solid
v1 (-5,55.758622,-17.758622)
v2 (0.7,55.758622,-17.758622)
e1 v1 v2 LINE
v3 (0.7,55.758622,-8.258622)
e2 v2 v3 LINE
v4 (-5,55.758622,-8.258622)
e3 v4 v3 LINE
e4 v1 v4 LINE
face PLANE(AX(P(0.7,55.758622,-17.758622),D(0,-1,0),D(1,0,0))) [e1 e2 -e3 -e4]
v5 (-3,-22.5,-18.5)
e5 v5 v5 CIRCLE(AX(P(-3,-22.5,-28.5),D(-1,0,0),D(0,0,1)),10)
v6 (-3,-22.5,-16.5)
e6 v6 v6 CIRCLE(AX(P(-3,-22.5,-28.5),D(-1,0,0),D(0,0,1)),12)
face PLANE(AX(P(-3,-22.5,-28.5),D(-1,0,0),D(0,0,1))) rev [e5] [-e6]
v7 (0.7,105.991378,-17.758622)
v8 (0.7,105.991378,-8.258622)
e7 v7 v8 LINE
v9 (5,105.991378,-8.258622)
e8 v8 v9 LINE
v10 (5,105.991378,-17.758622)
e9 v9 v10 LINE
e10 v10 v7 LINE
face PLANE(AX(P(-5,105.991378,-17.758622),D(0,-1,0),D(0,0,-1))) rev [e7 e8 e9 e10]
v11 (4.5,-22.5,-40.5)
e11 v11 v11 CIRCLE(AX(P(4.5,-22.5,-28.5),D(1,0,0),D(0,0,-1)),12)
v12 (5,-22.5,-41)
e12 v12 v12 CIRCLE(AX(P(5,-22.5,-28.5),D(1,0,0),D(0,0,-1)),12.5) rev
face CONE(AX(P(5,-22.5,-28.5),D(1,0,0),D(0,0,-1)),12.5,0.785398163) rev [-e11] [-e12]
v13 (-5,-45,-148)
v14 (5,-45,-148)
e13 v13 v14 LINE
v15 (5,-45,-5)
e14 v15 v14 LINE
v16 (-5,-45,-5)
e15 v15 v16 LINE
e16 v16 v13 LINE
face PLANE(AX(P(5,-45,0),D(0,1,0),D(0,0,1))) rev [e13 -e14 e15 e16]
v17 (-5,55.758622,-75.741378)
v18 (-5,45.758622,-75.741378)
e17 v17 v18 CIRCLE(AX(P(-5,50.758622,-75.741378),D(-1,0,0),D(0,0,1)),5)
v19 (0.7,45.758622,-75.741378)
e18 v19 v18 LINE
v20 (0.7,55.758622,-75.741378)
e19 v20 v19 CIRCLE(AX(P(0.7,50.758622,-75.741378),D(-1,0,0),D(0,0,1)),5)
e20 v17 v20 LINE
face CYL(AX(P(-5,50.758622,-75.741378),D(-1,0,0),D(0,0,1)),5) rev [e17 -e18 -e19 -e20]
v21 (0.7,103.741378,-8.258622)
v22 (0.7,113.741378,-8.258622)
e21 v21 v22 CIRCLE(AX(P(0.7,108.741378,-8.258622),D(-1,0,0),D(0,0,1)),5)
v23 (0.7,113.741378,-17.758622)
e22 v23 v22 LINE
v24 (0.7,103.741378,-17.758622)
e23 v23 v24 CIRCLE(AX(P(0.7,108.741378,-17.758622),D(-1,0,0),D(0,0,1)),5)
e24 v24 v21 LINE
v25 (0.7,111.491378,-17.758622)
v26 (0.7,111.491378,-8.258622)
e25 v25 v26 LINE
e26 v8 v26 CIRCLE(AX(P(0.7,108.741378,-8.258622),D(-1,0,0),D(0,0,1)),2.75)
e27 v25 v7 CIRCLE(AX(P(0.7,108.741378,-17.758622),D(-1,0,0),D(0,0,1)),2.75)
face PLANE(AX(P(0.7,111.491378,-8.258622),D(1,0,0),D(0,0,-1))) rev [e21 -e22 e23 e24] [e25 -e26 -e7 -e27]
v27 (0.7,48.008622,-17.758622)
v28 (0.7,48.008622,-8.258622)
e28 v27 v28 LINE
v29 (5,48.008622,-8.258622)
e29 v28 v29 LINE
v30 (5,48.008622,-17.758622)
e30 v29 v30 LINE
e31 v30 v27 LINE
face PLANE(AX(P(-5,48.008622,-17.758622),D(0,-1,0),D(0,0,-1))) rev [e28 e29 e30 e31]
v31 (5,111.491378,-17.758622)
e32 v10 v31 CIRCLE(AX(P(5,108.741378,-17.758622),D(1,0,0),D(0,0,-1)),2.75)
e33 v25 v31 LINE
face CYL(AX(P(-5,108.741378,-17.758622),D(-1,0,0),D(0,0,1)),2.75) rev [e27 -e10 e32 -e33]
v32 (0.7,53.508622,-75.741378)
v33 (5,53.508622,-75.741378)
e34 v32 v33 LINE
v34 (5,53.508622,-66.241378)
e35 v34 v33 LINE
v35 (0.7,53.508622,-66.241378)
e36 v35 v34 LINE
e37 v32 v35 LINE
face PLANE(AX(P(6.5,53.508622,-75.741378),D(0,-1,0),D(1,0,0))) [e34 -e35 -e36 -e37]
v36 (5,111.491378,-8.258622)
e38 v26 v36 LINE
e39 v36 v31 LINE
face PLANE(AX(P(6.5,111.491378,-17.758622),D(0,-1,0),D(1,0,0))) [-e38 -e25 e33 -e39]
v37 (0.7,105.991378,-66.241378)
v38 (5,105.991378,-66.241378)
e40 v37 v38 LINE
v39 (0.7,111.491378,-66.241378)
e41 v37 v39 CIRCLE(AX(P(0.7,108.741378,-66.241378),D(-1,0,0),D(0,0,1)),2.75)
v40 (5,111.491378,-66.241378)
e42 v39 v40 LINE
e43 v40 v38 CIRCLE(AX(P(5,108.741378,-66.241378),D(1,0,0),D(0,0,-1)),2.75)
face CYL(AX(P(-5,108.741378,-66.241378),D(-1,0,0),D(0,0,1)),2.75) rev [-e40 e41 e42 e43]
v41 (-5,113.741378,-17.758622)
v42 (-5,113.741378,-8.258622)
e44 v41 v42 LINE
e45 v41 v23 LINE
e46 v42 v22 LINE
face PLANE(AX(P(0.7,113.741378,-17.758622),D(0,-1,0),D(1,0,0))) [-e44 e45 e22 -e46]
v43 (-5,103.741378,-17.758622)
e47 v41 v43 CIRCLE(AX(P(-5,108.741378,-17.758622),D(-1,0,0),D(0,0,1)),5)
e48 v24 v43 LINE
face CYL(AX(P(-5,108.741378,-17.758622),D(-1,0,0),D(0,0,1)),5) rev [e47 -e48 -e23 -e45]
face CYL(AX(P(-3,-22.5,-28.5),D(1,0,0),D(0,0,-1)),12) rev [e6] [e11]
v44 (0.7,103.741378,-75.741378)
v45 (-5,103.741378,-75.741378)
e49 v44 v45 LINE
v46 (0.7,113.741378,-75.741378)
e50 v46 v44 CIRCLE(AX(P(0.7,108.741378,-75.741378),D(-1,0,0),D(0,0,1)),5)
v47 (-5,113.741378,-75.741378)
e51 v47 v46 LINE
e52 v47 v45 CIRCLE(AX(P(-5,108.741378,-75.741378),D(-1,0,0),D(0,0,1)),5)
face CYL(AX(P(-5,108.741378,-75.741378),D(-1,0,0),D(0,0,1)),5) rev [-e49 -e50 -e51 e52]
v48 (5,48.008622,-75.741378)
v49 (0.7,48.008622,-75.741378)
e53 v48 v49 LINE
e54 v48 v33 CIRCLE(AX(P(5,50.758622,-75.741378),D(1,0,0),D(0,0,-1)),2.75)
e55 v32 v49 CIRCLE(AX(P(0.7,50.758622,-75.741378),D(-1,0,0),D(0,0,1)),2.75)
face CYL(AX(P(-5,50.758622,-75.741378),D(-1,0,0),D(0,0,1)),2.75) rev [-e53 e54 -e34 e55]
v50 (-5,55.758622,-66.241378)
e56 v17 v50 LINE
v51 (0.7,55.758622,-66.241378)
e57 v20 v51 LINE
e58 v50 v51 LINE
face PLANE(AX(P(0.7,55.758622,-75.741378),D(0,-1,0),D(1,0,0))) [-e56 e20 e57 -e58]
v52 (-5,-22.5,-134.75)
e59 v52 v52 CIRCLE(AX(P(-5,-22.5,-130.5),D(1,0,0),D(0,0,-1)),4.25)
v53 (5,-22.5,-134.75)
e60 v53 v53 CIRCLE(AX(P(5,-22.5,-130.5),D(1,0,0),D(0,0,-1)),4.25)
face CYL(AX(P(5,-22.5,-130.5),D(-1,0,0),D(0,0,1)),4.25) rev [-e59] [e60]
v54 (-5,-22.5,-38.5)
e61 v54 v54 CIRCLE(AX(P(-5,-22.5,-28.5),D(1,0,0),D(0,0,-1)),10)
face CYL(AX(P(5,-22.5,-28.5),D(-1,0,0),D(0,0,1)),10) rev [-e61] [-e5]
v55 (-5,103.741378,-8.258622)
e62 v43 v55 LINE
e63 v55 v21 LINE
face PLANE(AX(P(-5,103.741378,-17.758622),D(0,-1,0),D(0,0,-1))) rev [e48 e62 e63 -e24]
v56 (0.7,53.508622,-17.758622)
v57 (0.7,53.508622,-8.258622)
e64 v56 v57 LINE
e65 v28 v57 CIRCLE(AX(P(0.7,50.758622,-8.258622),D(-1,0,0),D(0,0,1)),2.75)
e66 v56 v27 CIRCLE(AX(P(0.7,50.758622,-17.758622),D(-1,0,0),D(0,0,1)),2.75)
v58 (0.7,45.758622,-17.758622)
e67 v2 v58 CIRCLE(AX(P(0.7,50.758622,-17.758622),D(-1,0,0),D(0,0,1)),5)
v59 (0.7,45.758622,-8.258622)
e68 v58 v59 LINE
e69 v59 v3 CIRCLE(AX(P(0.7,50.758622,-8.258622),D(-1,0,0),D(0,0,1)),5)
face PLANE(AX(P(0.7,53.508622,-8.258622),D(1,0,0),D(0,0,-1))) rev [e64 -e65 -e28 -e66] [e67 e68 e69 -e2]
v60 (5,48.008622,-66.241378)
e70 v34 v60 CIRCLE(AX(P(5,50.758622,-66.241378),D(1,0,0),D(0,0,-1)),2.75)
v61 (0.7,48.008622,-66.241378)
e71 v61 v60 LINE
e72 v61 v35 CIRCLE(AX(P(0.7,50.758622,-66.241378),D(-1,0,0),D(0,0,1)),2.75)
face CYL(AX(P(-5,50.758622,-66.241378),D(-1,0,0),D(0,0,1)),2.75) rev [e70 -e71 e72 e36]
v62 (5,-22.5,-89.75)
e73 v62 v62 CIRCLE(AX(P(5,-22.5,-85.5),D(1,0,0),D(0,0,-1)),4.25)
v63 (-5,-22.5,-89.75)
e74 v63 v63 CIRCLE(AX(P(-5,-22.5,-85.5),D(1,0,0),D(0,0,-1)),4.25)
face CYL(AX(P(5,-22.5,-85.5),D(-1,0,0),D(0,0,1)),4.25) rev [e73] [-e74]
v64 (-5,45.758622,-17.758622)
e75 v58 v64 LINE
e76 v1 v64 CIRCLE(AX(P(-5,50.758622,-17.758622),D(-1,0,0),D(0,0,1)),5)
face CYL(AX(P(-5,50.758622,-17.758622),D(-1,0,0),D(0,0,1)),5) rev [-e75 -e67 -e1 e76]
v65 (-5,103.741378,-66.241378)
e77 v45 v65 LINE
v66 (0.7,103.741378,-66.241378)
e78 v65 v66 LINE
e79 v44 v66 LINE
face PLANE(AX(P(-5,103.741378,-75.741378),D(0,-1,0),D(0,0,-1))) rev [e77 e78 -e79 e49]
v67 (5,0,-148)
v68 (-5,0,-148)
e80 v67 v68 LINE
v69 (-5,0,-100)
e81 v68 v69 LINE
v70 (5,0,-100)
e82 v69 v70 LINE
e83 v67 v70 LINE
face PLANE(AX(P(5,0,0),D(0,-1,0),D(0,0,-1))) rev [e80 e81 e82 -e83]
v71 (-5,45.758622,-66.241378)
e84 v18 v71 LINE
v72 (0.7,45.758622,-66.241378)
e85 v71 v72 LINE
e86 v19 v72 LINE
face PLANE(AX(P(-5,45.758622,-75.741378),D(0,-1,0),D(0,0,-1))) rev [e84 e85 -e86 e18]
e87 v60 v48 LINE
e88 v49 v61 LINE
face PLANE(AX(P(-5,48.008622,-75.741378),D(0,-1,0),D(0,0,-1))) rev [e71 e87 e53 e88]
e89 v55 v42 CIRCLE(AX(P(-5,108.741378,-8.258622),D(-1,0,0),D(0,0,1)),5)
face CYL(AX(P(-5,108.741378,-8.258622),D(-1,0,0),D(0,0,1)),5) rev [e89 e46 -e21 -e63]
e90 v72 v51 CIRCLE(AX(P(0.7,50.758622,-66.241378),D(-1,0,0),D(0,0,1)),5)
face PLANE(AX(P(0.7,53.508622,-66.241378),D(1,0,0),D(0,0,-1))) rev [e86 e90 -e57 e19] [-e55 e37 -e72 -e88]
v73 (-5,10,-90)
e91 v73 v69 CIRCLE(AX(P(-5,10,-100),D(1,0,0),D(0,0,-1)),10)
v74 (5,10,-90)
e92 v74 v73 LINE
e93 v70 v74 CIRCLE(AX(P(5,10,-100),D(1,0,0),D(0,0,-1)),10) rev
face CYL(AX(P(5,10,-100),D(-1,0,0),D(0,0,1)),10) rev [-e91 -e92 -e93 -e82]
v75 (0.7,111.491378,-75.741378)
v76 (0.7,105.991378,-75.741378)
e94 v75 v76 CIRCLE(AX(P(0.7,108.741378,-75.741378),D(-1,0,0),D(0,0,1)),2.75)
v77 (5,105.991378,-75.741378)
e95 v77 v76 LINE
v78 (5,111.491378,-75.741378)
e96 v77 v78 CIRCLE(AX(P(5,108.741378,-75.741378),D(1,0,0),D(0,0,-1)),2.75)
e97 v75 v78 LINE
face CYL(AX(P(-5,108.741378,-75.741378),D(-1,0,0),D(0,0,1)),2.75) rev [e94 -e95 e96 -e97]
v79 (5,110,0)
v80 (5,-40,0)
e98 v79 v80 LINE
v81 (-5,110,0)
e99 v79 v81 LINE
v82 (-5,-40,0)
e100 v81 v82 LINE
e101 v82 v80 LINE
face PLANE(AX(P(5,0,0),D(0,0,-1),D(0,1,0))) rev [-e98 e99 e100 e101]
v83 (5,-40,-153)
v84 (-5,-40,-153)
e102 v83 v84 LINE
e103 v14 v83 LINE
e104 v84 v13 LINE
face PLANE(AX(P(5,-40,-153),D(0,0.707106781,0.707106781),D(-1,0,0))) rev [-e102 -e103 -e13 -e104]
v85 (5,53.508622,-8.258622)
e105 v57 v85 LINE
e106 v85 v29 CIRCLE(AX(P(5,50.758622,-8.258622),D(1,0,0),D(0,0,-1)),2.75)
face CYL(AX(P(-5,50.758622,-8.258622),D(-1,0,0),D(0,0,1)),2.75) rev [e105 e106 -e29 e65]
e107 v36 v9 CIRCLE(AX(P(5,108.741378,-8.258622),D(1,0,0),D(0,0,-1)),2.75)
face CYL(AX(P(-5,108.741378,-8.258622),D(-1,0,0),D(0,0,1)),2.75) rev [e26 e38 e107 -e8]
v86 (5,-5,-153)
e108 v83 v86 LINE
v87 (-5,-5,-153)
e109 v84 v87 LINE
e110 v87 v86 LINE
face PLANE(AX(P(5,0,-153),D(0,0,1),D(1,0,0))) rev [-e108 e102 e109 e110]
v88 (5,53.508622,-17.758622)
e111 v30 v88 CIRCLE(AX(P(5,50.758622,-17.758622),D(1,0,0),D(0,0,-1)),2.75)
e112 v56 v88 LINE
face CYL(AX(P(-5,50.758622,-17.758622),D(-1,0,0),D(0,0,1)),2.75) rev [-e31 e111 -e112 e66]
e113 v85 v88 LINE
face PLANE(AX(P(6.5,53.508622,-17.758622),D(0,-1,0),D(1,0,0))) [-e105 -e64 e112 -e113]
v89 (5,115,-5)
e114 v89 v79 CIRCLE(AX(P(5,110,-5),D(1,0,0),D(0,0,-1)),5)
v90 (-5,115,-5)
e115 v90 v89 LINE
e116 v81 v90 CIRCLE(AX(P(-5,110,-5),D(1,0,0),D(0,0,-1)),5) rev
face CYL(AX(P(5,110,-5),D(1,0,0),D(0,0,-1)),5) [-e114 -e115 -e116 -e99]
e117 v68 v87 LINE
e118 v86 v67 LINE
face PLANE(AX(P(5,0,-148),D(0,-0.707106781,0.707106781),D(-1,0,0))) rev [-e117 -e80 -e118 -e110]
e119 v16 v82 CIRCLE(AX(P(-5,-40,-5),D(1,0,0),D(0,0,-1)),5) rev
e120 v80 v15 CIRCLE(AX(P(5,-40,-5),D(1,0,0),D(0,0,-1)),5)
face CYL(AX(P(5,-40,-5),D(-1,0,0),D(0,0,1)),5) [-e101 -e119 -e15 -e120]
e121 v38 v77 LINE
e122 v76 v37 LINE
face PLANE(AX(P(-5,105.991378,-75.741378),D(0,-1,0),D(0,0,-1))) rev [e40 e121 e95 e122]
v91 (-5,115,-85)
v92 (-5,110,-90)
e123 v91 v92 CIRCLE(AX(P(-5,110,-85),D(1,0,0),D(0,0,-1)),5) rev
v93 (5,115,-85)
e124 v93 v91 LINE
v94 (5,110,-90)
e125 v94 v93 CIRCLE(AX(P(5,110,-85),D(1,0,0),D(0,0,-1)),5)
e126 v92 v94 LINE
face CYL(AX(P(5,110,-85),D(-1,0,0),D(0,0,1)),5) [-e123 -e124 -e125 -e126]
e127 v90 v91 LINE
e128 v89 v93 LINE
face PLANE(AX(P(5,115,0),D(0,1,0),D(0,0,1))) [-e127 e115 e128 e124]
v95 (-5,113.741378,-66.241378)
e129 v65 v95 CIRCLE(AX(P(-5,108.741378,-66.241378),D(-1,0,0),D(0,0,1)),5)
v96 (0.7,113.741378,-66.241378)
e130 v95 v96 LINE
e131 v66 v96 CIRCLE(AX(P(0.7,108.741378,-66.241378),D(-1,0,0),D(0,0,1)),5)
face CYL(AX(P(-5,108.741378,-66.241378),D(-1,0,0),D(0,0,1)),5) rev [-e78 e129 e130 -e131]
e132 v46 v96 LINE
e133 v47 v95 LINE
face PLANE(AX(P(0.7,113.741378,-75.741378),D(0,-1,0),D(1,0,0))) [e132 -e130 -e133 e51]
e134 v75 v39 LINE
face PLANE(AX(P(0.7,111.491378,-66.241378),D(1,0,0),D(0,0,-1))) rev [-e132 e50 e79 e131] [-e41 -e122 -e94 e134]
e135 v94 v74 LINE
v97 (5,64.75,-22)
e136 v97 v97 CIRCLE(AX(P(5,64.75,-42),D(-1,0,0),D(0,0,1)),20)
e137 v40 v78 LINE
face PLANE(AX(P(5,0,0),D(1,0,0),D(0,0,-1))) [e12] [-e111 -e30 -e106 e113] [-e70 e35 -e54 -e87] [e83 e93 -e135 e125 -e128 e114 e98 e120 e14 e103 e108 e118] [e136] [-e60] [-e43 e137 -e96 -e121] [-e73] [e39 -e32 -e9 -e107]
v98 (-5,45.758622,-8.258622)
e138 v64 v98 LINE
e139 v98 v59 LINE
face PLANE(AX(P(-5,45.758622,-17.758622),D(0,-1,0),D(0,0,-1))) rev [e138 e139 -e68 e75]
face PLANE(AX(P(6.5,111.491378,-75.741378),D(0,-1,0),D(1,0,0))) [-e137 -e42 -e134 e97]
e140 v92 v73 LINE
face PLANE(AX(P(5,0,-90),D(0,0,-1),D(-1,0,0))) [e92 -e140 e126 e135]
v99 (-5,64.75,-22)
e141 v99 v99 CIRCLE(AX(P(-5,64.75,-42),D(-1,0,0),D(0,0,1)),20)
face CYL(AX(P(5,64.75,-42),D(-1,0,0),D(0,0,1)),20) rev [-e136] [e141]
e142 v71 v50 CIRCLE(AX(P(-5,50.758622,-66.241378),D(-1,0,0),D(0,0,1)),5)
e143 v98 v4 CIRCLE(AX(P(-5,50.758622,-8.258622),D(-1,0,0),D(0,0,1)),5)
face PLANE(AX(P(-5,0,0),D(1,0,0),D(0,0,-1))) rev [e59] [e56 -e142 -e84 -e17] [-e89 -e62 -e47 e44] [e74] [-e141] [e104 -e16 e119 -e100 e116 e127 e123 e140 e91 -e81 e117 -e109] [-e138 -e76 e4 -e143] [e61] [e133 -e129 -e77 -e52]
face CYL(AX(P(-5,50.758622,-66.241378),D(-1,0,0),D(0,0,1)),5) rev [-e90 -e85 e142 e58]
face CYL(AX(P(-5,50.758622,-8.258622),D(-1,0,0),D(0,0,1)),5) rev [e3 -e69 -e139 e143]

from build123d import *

# Parameters (mm, degrees)
SKETCH_1_W             = 153
SKETCH_1_H             = 45
SKETCH_1_R             = 10
SKETCH_1_R_2           = 4.25
EXTRUDE_1_DEPTH        = 5
SKETCH_6_R             = 12
CUT_EXTRUDE_1077_DEPTH = 8
SKETCH_9_W             = 90
SKETCH_9_H             = 115
EXTRUDE_2_DEPTH        = 10
HOLE_START             = -5
HOLE_WIZARD_2_DEPTH    = 5.7
HOLE_START_2           = 0.7
HOLE_WIZARD_2_2_DEPTH  = 4.3
CHAMFER_1_SIZE         = 5
FILLET_1_R             = 5
CHAMFER_2_SIZE         = 0.5
FILLET_2_R             = 10
SKETCH_13_R            = 20
CUT_EXTRUDE_1_DEPTH    = 10


# Read off the part's stored shape, not the designer's step: 打孔尺寸(%根据)内六角圆柱头螺钉的类型2
with BuildPart() as part:
    # 草图1 → 凸台-拉伸1 (new, symmetric)
    with BuildSketch(Plane(origin=(0, 0, 0), x_dir=(0, 0, -1), z_dir=(1, 0, 0))):
        with Locations((76.5, -22.5)):
            Rectangle(SKETCH_1_W, SKETCH_1_H)
        with Locations((28.5, -22.5)):
            Circle(SKETCH_1_R, mode=Mode.SUBTRACT)
        with Locations((85.5, -22.5)):
            Circle(SKETCH_1_R_2, mode=Mode.SUBTRACT)
        with Locations((130.5, -22.5)):
            Circle(SKETCH_1_R_2, mode=Mode.SUBTRACT)
    extrude(amount=EXTRUDE_1_DEPTH, both=True)

    # 草图6 → Cut-Extrude 1077 (cut)
    with BuildSketch(Plane.ZY.offset(-5)):
        with Locations((-28.5, -22.5)):
            Circle(SKETCH_6_R)
    extrude(amount=CUT_EXTRUDE_1077_DEPTH, mode=Mode.SUBTRACT)

    # 草图9 → 凸台-拉伸2 (add)
    with BuildSketch(Plane.ZY.offset(5)):
        with Locations((-45, 57.5)):
            Rectangle(SKETCH_9_W, SKETCH_9_H)
    extrude(amount=-EXTRUDE_2_DEPTH)

    # 打孔尺寸(%根据)内六角圆柱头螺钉的类型2 outline → 打孔尺寸(%根据)内六角圆柱头螺钉的类型2 (cut)
    with BuildSketch(Plane.YZ.offset(HOLE_START)):
        with BuildLine():
            ThreePointArc((55.758621971, -66.241378029), (50.758621971, -61.241378029), (45.758621971, -66.241378029))
            Line((45.758621971, -66.241378029), (45.758621971, -75.741378029))
            ThreePointArc((45.758621971, -75.741378029), (50.758621971, -80.741378029), (55.758621971, -75.741378029))
            Line((55.758621971, -75.741378029), (55.758621971, -66.241378029))
        make_face()
        with BuildLine():
            Line((55.758621971, -17.758621971), (55.758621971, -8.258621971))
            ThreePointArc((55.758621971, -8.258621971), (50.758621971, -3.258621971), (45.758621971, -8.258621971))
            Line((45.758621971, -8.258621971), (45.758621971, -17.758621971))
            ThreePointArc((45.758621971, -17.758621971), (50.758621971, -22.758621971), (55.758621971, -17.758621971))
        make_face()
        with BuildLine():
            ThreePointArc((113.741378029, -8.258621971), (108.741378029, -3.258621971), (103.741378029, -8.258621971))
            Line((103.741378029, -8.258621971), (103.741378029, -17.758621971))
            ThreePointArc((103.741378029, -17.758621971), (108.741378029, -22.758621971), (113.741378029, -17.758621971))
            Line((113.741378029, -17.758621971), (113.741378029, -8.258621971))
        make_face()
        with BuildLine():
            Line((113.741378029, -75.741378029), (113.741378029, -66.241378029))
            ThreePointArc((113.741378029, -66.241378029), (108.741378029, -61.241378029), (103.741378029, -66.241378029))
            Line((103.741378029, -66.241378029), (103.741378029, -75.741378029))
            ThreePointArc((103.741378029, -75.741378029), (108.741378029, -80.741378029), (113.741378029, -75.741378029))
        make_face()
    extrude(amount=HOLE_WIZARD_2_DEPTH, mode=Mode.SUBTRACT)

    # Hole Wizard 2 2 outline → Hole Wizard 2 2 (cut)
    with BuildSketch(Plane.YZ.offset(HOLE_START_2)):
        with BuildLine():
            ThreePointArc((53.508621971, -66.241378029), (50.758621971, -63.491378029), (48.008621971, -66.241378029))
            Line((48.008621971, -66.241378029), (48.008621971, -75.741378029))
            ThreePointArc((48.008621971, -75.741378029), (50.758621971, -78.491378029), (53.508621971, -75.741378029))
            Line((53.508621971, -75.741378029), (53.508621971, -66.241378029))
        make_face()
        with BuildLine():
            Line((53.508621971, -17.758621971), (53.508621971, -8.258621971))
            ThreePointArc((53.508621971, -8.258621971), (50.758621971, -5.508621971), (48.008621971, -8.258621971))
            Line((48.008621971, -8.258621971), (48.008621971, -17.758621971))
            ThreePointArc((48.008621971, -17.758621971), (50.758621971, -20.508621971), (53.508621971, -17.758621971))
        make_face()
        with BuildLine():
            ThreePointArc((111.491378029, -8.258621971), (108.741378029, -5.508621971), (105.991378029, -8.258621971))
            Line((105.991378029, -8.258621971), (105.991378029, -17.758621971))
            ThreePointArc((105.991378029, -17.758621971), (108.741378029, -20.508621971), (111.491378029, -17.758621971))
            Line((111.491378029, -17.758621971), (111.491378029, -8.258621971))
        make_face()
        with BuildLine():
            Line((111.491378029, -75.741378029), (111.491378029, -66.241378029))
            ThreePointArc((111.491378029, -66.241378029), (108.741378029, -63.491378029), (105.991378029, -66.241378029))
            Line((105.991378029, -66.241378029), (105.991378029, -75.741378029))
            ThreePointArc((105.991378029, -75.741378029), (108.741378029, -78.491378029), (111.491378029, -75.741378029))
        make_face()
    extrude(amount=HOLE_WIZARD_2_2_DEPTH, mode=Mode.SUBTRACT)

    # 倒角1
    chamfer_1_edges = [part.edges().sort_by_distance(p)[0] for p in [
        (0, -45, -153),
        (0, 0, -153),
    ]]
    chamfer(chamfer_1_edges, length=CHAMFER_1_SIZE)

    # 圆角1
    fillet_1_edges = [part.edges().sort_by_distance(p)[0] for p in [
        (0, -45, 0),
        (0, 115, -90),
        (0, 115, 0),
    ]]
    fillet(fillet_1_edges, radius=FILLET_1_R)

    # 倒角2
    chamfer_2_edges = [part.edges().sort_by_distance(p)[0] for p in [
        (5, -22.5, -40.5),
    ]]
    chamfer(chamfer_2_edges, length=CHAMFER_2_SIZE)

    # 圆角2
    fillet_2_edges = [part.edges().sort_by_distance(p)[0] for p in [
        (0, 0, -90),
    ]]
    fillet(fillet_2_edges, radius=FILLET_2_R)

    # 草图13 → 切除-拉伸1 (cut)
    with BuildSketch(Plane.ZY.offset(5)):
        with Locations((-42, 64.75)):
            Circle(SKETCH_13_R)
    extrude(amount=-CUT_EXTRUDE_1_DEPTH, mode=Mode.SUBTRACT)


solid = part.part
